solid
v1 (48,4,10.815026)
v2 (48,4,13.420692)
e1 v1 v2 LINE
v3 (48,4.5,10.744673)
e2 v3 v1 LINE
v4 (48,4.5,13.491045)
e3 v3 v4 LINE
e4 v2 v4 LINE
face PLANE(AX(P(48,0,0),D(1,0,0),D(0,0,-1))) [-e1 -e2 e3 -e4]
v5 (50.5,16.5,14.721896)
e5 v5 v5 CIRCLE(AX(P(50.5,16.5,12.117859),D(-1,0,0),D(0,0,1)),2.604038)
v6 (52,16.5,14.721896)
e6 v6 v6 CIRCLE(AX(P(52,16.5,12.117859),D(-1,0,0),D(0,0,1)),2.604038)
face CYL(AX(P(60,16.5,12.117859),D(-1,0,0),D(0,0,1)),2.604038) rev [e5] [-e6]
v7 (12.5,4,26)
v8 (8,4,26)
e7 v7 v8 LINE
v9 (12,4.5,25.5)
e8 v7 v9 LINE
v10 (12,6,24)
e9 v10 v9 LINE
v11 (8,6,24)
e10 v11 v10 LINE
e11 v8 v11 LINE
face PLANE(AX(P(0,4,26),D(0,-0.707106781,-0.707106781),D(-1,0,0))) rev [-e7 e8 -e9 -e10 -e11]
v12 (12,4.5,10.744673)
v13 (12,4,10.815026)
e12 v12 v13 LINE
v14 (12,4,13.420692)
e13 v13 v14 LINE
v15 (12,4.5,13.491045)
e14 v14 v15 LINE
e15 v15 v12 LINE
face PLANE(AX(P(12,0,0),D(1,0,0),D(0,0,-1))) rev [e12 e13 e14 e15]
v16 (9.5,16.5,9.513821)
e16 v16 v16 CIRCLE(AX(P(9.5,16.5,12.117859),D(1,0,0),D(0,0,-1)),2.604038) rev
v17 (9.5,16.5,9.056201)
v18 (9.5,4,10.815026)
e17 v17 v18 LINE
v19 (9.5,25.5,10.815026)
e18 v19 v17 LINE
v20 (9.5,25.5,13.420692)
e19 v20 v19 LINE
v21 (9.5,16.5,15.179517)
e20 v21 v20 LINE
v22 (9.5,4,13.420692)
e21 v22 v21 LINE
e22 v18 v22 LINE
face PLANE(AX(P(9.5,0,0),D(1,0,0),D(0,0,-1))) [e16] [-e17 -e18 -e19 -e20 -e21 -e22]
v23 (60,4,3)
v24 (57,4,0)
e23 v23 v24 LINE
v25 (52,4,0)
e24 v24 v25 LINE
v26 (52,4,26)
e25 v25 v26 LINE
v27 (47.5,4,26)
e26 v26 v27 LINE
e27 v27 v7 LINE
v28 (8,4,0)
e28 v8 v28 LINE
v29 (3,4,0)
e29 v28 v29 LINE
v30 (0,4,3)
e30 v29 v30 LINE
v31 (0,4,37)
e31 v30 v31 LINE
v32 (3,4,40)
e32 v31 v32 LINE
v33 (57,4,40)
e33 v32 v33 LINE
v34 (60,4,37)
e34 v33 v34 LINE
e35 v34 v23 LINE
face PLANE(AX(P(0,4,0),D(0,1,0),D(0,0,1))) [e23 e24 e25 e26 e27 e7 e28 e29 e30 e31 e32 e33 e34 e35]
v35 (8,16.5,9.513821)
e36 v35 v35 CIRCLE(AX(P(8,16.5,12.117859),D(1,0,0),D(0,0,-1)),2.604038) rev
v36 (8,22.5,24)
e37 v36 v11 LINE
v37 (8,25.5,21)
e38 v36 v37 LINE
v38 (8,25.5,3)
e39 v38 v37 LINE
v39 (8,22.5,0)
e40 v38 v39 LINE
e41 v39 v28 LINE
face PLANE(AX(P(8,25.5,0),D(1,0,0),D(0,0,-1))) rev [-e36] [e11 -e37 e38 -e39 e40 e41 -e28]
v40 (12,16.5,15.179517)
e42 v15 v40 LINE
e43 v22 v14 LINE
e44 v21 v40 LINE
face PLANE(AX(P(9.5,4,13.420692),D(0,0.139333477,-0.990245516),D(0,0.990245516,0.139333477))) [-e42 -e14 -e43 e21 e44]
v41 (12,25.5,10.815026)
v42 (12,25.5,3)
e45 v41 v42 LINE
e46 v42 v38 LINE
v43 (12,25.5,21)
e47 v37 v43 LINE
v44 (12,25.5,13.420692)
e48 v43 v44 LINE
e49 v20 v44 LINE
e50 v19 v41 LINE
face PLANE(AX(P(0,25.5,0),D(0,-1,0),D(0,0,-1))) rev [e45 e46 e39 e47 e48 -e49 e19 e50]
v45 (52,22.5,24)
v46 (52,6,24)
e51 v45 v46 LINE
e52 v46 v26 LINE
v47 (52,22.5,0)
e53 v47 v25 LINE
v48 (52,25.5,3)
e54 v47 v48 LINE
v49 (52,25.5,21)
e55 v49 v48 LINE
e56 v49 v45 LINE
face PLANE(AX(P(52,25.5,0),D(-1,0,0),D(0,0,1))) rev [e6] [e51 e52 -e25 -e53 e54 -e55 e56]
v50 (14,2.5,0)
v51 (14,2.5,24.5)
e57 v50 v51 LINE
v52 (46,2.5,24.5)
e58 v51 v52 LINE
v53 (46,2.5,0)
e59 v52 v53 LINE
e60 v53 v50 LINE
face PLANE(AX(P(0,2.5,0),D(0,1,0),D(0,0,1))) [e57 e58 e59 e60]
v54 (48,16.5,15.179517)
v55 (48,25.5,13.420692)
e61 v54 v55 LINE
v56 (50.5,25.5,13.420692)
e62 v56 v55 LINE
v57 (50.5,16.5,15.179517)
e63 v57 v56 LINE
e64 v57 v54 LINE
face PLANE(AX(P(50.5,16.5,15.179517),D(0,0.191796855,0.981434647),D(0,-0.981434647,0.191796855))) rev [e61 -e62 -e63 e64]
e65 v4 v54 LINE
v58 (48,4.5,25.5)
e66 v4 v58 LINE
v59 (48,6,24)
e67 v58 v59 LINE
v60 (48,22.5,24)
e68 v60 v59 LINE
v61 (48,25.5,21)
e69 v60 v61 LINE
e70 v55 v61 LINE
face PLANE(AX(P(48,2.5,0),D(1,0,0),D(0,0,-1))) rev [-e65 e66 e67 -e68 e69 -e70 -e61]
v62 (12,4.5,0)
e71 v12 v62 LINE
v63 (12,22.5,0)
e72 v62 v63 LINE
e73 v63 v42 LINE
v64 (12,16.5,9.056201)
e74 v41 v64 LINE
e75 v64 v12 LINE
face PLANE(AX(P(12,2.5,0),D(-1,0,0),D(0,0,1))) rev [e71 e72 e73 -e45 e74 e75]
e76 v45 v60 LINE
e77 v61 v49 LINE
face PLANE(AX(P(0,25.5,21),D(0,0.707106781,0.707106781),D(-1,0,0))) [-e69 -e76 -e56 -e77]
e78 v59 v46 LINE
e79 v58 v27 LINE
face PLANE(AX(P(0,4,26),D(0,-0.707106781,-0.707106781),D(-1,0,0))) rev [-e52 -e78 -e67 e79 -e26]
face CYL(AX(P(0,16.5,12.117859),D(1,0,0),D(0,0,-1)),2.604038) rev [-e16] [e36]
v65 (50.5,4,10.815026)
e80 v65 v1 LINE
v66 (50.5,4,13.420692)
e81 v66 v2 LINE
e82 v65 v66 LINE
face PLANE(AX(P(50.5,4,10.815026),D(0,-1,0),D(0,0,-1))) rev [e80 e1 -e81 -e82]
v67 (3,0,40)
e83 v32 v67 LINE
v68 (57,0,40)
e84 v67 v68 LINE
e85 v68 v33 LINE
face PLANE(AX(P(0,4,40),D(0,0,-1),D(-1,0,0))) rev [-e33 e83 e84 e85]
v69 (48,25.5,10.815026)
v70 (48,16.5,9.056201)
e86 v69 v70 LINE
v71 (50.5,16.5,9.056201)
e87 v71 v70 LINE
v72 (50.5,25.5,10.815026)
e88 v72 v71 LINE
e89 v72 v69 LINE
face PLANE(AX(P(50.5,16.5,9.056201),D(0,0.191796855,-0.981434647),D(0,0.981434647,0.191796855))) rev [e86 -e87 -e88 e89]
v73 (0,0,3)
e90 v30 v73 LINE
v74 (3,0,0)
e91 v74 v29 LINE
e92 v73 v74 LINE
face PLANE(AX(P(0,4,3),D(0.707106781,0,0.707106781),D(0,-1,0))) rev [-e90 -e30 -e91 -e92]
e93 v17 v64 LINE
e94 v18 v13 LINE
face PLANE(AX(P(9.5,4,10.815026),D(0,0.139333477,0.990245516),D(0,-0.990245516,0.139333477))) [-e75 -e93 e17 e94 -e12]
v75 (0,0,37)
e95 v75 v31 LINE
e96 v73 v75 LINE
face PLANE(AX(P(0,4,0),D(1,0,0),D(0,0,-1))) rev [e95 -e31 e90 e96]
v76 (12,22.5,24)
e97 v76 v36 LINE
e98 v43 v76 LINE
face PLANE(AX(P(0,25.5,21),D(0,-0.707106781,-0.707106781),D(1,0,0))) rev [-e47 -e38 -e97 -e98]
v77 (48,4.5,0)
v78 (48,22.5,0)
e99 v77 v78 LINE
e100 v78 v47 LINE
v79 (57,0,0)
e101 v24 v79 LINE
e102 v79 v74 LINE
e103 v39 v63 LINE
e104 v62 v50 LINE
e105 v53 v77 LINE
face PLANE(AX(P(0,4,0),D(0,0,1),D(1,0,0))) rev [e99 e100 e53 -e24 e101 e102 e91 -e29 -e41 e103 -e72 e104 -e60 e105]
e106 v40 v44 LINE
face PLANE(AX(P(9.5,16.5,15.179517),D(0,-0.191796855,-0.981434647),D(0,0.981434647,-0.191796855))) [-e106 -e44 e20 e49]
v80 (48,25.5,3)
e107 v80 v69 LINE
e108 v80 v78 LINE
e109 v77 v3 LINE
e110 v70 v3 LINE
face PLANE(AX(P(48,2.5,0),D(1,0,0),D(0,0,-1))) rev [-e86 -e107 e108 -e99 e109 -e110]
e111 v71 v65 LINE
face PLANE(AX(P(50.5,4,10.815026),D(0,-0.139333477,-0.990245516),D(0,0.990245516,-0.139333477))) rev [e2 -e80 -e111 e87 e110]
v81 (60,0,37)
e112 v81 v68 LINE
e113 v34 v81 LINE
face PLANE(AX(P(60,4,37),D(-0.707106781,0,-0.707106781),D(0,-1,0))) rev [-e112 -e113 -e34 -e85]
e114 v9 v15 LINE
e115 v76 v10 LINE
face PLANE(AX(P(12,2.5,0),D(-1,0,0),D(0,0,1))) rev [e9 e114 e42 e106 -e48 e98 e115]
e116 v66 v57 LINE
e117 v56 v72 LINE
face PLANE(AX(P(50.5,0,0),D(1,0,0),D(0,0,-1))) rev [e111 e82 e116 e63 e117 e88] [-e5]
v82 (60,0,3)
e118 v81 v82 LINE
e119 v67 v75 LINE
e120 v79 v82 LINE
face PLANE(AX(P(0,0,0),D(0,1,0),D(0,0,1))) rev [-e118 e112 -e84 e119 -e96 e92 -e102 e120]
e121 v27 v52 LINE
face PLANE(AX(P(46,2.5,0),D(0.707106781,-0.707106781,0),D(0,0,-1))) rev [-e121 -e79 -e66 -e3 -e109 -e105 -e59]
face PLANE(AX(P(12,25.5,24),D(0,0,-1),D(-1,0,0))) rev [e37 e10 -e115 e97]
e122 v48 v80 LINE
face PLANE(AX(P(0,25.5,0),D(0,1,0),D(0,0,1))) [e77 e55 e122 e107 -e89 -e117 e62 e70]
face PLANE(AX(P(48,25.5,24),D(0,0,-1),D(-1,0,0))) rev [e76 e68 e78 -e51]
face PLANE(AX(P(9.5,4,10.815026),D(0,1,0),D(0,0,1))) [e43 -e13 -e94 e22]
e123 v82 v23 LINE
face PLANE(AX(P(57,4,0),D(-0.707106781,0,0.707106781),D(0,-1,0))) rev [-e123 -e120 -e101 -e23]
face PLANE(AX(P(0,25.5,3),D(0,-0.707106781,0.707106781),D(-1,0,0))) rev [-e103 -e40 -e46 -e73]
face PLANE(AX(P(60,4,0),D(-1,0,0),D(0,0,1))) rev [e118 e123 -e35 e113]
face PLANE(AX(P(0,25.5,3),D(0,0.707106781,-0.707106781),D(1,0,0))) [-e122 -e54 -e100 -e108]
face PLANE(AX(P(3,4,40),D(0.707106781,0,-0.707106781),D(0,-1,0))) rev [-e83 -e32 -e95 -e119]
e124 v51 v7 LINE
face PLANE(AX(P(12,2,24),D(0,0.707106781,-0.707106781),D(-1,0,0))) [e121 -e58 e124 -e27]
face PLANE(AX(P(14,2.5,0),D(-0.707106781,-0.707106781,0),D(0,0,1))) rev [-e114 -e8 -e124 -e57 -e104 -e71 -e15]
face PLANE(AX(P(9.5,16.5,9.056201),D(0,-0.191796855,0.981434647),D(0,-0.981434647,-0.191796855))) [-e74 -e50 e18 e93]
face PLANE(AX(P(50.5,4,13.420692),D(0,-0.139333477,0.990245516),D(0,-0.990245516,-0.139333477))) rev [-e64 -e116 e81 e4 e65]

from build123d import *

# Parameters (mm, degrees)
SKETCH1_W           = 60
SKETCH1_H           = 40
BOSS_EXTRUDE1_DEPTH = 4
CHAMFER1_SIZE       = 3
SKETCH2_W           = 36
SKETCH2_H           = 24
CUT_EXTRUDE1_DEPTH  = 1.5
SKETCH3_W           = 4
SKETCH3_H           = 24
BOSS_EXTRUDE2_DEPTH = 23
CHAMFER2_SIZE       = 3
CHAMFER3_SIZE       = 2
CHAMFER4_SIZE       = 2
CHAMFER5_SIZE       = 2
CUT_EXTRUDE2_DEPTH  = 2.5
SKETCH7_R           = 2.604037506
CUT_EXTRUDE3_DEPTH  = 70.285640648
CUT_EXTRUDE4_DEPTH  = 2.5
SKETCH12_R          = 2.604037506
CUT_EXTRUDE6_DEPTH  = 68.485183559


with BuildPart() as part:
    # Sketch1 → Boss-Extrude1 (new body)
    with BuildSketch(Plane(origin=(0, 0, 0), x_dir=(1, 0, 0), z_dir=(0, 1, 0))):
        with Locations((30, -20)):
            Rectangle(SKETCH1_W, SKETCH1_H)
    extrude(amount=BOSS_EXTRUDE1_DEPTH)

    # Chamfer1
    chamfer1_edges = [part.edges().sort_by_distance(p)[0] for p in [
        (0, 2, 0),
        (60, 2, 0),
        (60, 2, 40),
        (0, 2, 40),
    ]]
    chamfer(chamfer1_edges, length=CHAMFER1_SIZE)

    # Sketch2 → Cut-Extrude1 (cut)
    with BuildSketch(Plane(origin=(0, 4, 0), x_dir=(1, 0, 0), z_dir=(0, 1, 0))):
        with Locations((30, -12)):
            Rectangle(SKETCH2_W, SKETCH2_H)
    extrude(amount=-CUT_EXTRUDE1_DEPTH, mode=Mode.SUBTRACT)

    # Sketch3 → Boss-Extrude2 (add)
    with BuildSketch(Plane(origin=(0, 2.5, 0), x_dir=(1, 0, 0), z_dir=(0, 1, 0))):
        with Locations((50, -12)):
            Rectangle(SKETCH3_W, SKETCH3_H)
        with Locations((10, -12)):
            Rectangle(SKETCH3_W, SKETCH3_H)
    extrude(amount=BOSS_EXTRUDE2_DEPTH)

    # Chamfer2
    chamfer2_edges = [part.edges().sort_by_distance(p)[0] for p in [
        (50, 25.5, 24),
        (50, 25.5, 0),
        (10, 25.5, 0),
        (10, 25.5, 24),
    ]]
    chamfer(chamfer2_edges, length=CHAMFER2_SIZE)

    # Chamfer3
    chamfer3_edges = [part.edges().sort_by_distance(p)[0] for p in [
        (50, 4, 24),
        (10, 4, 24),
    ]]
    chamfer(chamfer3_edges, length=CHAMFER3_SIZE)

    # Chamfer4
    # the kernel refuses this chamfer: 2 mm, written as the material it takes off along each edge
    with BuildSketch(Plane(origin=(48, 4, 24), x_dir=(0, -0.9996219169112968, -0.027495876610585623), z_dir=(-1, 0, 0))) as chamfer4_piece_1_section:
        Polygon((CHAMFER4_SIZE * 0.999621916911, CHAMFER4_SIZE * 0.0274958766106), (-CHAMFER4_SIZE * 0.0274958766106, CHAMFER4_SIZE * 0.999621916911), (0, 0), align=None)
    chamfer4_piece_1 = extrude(amount=36, mode=Mode.PRIVATE)
    chamfer4_piece_1 = split(chamfer4_piece_1, bisect_by=Plane(origin=(30, 2.5, 24.699033576), z_dir=(0, 1, 0)), keep=Keep.TOP, mode=Mode.PRIVATE)
    chamfer4_piece_1 = split(chamfer4_piece_1, bisect_by=Plane(origin=(30, 4.361799404, 25.638200596), z_dir=(0, -0.7071067811865476, -0.7071067811865476)), keep=Keep.TOP, mode=Mode.PRIVATE)
    add(chamfer4_piece_1, mode=Mode.SUBTRACT)

    # Chamfer5
    # the kernel refuses this chamfer: 2 mm, written as the material it adds along each edge
    with BuildSketch(Plane(origin=(12, 2.5, 29.643365976), x_dir=(-0.027495876610586487, 0.9996219169112968, 0), z_dir=(0, 0, -1))) as chamfer5_piece_1_section:
        Polygon((CHAMFER5_SIZE * 0.999621916911, CHAMFER5_SIZE * 0.0274958766106), (-CHAMFER5_SIZE * 0.0274958766106, CHAMFER5_SIZE * 0.999621916911), (0, 0), align=None)
    chamfer5_piece_1 = extrude(amount=29.643365976, mode=Mode.PRIVATE)
    chamfer5_piece_1 = split(chamfer5_piece_1, bisect_by=Plane(origin=(12.696713147, 10.276643426, 19.723356574), z_dir=(0, -0.7071067811865476, -0.7071067811865476)), keep=Keep.TOP, mode=Mode.PRIVATE)
    add(chamfer5_piece_1)
    with BuildSketch(Plane(origin=(48, 2.5, 29.643365976), x_dir=(-0.9996219169112968, -0.027495876610586296, 0), z_dir=(0, 0, -1))) as chamfer5_piece_2_section:
        Polygon((CHAMFER5_SIZE * 0.999621916911, CHAMFER5_SIZE * 0.0274958766106), (-CHAMFER5_SIZE * 0.0274958766106, CHAMFER5_SIZE * 0.999621916911), (0, 0), align=None)
    chamfer5_piece_2 = extrude(amount=29.643365976, mode=Mode.PRIVATE)
    chamfer5_piece_2 = split(chamfer5_piece_2, bisect_by=Plane(origin=(47.833064516, 10.624596774, 19.375403226), z_dir=(0, -0.7071067811865476, -0.7071067811865476)), keep=Keep.TOP, mode=Mode.PRIVATE)
    add(chamfer5_piece_2)

    # Sketch4 → Cut-Extrude2 (cut)
    with BuildSketch(Plane.ZY.offset(-48)):
        Polygon((9.05620064, 16.5), (10.815025537, 25.5), (13.420692052, 25.5), (15.179516949, 16.5), (13.420692052, 4), (10.815025537, 4), align=None)
    extrude(amount=-CUT_EXTRUDE2_DEPTH, mode=Mode.SUBTRACT)

    # Sketch7 → Cut-Extrude3 (cut, through all)
    with BuildSketch(Plane.ZY.offset(-50.5)):
        with Locations((12.117858795, 16.5)):
            Circle(SKETCH7_R)
    extrude(amount=-CUT_EXTRUDE3_DEPTH, mode=Mode.SUBTRACT)

    # Sketch11 → Cut-Extrude4 (cut)
    with BuildSketch(Plane.ZY.offset(-12)):
        Polygon((9.05620064, 16.5), (10.815025537, 25.5), (13.420692052, 25.5), (15.179516949, 16.5), (13.420692052, 4), (10.815025537, 4), align=None)
    extrude(amount=CUT_EXTRUDE4_DEPTH, mode=Mode.SUBTRACT)

    # Sketch12 → Cut-Extrude6 (cut, through all)
    with BuildSketch(Plane.ZY.offset(-12)):
        with Locations((12.117858795, 16.5)):
            Circle(SKETCH12_R)
    extrude(amount=CUT_EXTRUDE6_DEPTH, mode=Mode.SUBTRACT)


solid = part.part
